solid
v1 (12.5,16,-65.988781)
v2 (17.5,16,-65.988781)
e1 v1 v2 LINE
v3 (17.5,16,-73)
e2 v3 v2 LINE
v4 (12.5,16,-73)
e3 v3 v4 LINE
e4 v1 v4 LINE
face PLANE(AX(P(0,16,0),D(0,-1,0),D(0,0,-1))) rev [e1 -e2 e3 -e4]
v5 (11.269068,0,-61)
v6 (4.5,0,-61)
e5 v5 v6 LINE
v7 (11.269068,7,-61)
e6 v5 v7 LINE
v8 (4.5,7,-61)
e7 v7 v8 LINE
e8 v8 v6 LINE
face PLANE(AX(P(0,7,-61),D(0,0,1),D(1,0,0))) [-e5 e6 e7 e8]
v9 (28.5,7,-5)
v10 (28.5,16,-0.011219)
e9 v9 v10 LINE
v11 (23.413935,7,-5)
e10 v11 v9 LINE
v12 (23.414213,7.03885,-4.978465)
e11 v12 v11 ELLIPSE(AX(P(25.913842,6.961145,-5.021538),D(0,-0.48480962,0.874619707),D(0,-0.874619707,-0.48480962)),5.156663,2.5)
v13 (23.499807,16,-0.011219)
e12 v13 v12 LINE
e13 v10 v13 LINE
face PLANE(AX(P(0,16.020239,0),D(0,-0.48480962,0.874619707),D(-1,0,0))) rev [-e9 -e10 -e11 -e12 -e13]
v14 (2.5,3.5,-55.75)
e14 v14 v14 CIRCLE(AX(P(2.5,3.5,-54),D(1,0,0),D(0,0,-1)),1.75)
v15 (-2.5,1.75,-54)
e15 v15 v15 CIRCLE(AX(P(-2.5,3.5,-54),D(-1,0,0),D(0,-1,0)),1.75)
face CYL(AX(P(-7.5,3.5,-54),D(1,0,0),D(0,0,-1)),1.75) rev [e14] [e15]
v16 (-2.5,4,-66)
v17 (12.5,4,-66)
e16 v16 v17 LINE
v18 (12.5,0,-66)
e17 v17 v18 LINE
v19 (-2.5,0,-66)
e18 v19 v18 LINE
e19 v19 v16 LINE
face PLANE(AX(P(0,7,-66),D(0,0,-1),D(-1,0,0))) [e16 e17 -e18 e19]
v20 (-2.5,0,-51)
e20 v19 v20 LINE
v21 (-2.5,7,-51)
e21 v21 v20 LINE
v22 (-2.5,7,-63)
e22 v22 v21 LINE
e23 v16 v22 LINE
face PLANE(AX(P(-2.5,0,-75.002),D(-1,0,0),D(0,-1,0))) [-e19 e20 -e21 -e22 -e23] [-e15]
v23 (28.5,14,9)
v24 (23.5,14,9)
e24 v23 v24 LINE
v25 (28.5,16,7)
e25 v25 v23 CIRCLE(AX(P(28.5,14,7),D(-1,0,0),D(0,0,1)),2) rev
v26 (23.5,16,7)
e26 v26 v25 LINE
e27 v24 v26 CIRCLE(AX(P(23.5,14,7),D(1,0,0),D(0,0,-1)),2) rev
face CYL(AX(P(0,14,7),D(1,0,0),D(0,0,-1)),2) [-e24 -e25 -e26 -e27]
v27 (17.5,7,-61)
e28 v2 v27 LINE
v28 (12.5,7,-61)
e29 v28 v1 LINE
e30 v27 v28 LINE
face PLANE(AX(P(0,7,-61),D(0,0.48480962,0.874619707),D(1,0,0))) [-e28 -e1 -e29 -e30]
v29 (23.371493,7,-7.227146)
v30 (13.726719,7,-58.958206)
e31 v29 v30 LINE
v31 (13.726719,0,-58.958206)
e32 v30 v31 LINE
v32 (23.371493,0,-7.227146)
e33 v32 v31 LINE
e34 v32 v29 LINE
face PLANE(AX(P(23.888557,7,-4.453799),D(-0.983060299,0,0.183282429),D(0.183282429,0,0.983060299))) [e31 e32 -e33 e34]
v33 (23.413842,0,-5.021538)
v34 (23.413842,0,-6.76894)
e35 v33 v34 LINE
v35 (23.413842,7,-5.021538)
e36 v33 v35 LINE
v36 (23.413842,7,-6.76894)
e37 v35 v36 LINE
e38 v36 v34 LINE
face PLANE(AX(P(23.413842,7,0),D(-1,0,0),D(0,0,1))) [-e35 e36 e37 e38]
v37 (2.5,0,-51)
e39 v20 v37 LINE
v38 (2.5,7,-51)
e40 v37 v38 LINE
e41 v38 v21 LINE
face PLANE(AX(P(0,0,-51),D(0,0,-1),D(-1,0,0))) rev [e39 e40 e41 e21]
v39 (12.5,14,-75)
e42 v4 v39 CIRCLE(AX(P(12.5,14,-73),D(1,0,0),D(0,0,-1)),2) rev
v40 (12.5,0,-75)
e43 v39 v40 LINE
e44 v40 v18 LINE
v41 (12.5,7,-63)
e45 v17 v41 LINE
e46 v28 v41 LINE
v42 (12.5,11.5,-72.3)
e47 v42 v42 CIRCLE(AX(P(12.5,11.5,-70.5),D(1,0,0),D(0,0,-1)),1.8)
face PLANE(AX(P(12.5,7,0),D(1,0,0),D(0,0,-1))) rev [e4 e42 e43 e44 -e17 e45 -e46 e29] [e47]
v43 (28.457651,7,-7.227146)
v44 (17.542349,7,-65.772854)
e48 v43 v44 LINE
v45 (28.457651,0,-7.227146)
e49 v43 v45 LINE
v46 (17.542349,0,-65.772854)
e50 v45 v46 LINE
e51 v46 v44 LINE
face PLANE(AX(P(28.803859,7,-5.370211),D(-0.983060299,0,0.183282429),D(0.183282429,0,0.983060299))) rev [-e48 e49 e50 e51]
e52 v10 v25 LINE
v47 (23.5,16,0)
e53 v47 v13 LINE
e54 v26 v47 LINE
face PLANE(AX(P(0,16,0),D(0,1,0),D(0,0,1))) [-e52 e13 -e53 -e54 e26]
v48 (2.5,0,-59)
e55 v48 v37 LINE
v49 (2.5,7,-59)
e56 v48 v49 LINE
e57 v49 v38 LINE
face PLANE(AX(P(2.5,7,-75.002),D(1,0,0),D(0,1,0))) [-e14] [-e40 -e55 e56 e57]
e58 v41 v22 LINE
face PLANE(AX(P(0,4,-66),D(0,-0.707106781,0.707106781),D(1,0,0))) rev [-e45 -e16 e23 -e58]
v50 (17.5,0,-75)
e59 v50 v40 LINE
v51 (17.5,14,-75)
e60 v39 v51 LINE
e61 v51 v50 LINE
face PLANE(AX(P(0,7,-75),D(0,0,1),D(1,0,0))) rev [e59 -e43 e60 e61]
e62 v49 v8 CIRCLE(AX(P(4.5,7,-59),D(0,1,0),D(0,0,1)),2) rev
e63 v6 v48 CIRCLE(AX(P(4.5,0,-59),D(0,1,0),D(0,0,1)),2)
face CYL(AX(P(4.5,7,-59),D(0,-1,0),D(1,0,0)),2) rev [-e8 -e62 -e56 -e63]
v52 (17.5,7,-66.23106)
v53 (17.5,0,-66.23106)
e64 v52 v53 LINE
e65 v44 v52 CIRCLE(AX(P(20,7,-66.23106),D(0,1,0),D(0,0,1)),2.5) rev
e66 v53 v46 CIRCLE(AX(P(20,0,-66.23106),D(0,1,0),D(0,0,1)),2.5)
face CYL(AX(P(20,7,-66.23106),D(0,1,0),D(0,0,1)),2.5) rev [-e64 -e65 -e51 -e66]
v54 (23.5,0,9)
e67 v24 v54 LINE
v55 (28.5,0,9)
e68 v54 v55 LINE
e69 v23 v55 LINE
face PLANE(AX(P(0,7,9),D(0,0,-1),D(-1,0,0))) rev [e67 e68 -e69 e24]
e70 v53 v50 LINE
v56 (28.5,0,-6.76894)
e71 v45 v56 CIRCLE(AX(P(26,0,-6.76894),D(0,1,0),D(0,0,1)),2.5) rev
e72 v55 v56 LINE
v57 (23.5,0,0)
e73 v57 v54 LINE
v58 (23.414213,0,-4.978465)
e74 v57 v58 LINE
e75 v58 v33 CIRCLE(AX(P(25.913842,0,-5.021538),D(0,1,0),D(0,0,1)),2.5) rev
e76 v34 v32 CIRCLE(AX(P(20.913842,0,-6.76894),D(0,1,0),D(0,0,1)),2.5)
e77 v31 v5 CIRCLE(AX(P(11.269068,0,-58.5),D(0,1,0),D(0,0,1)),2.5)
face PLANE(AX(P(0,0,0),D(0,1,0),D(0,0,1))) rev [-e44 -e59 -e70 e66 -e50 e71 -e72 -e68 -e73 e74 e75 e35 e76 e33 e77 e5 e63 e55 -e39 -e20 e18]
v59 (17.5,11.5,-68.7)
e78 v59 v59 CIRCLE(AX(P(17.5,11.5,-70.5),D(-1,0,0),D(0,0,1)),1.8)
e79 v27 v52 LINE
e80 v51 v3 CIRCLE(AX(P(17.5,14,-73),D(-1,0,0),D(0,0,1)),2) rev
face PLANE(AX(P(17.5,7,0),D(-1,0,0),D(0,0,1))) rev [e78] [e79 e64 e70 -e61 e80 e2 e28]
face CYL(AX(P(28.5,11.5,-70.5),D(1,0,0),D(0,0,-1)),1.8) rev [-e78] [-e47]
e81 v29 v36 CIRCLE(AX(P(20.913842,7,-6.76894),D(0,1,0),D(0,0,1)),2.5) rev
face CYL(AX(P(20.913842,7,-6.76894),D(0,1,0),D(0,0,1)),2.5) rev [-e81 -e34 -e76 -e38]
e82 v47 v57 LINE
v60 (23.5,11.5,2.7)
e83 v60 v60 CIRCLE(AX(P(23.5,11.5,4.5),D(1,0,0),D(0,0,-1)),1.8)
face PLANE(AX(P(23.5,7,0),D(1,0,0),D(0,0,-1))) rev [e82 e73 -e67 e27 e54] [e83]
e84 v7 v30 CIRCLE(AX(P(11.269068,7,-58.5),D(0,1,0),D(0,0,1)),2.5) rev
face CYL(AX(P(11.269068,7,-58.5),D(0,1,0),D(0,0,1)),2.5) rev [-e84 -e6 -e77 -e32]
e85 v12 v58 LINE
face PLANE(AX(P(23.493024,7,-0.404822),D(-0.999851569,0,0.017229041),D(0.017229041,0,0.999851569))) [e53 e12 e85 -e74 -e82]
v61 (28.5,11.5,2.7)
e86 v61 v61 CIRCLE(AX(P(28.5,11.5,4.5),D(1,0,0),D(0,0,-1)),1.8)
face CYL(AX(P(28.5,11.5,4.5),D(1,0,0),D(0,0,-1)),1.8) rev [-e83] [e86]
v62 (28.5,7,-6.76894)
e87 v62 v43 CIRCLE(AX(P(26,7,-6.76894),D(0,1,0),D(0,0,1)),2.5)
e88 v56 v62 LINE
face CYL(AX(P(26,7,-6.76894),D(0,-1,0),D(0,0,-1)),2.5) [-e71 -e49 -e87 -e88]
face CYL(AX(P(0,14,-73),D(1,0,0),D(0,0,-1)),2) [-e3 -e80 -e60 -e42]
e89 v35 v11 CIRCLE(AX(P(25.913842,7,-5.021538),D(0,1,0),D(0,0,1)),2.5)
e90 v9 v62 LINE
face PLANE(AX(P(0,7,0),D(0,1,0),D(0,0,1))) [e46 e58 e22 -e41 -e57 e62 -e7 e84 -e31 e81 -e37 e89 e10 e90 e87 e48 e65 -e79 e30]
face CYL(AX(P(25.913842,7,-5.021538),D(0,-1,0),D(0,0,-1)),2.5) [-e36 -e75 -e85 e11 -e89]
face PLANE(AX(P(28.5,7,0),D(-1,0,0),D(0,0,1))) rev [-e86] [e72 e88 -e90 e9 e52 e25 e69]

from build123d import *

# Parameters (mm, degrees)
BOSS_EXTRUDE1_DEPTH  = 7
BOSS_EXTRUDE2_START  = 7
SKETCH1_3_W          = 5
SKETCH1_3_H          = 9
BOSS_EXTRUDE2_DEPTH  = 9
M3_CLEARANCE_HOLE1_D = 3.6
FILLET2_R            = 2.5
CHAMFER3_SIZE        = 5
CHAMFER3_SIZE_2      = 9.020238776
CHAMFER2_SIZE        = 3
SKETCH6_W            = 5
SKETCH6_H            = 7
BOSS_EXTRUDE3_DEPTH  = 10
SKETCH7_R            = 1.75
CUT_EXTRUDE1_DEPTH   = 10
FILLET6_R            = 2
SKETCH8_W            = 84
SKETCH8_H            = 16
CUT_EXTRUDE2_DEPTH   = 26
FILLET8_R            = 2


with BuildPart() as part:
    # Sketch1 → Boss-Extrude1 (new body)
    with BuildSketch(Plane(origin=(0, 0, 0), x_dir=(1, 0, 0), z_dir=(0, 1, 0))):
        Polygon((-23.5, -9), (-23.5, 0), (-23.413842004, 5), (-23.413842004, 7), (-13.346045394, 61), (13.346045394, 61), (23.413842004, 7), (23.413842004, 5), (23.5, 0), (23.5, -9), (28.5, -9), (28.5, 7), (17.5, 66), (17.5, 75), (12.5, 75), (12.5, 66), (-12.5, 66), (-12.5, 75), (-17.5, 75), (-17.5, 66), (-28.5, 7), (-28.5, -9), align=None)
    extrude(amount=BOSS_EXTRUDE1_DEPTH)

    # Sketch1<3> → Boss-Extrude2 (add)
    with BuildSketch(Plane(origin=(0, 0, 0), x_dir=(1, 0, 0), z_dir=(0, 1, 0)).offset(BOSS_EXTRUDE2_START)):
        with Locations((-15, 70.5)):
            Rectangle(SKETCH1_3_W, SKETCH1_3_H)
        with Locations((15, 70.5)):
            Rectangle(SKETCH1_3_W, SKETCH1_3_H)
        with Locations((-26, -4.5)):
            Rectangle(SKETCH1_3_W, SKETCH1_3_H)
        with Locations((26, -4.5)):
            Rectangle(SKETCH1_3_W, SKETCH1_3_H)
    extrude(amount=BOSS_EXTRUDE2_DEPTH)

    # M3 Clearance Hole1 (through all)
    with Locations(Plane(origin=(28.5, 0, 0), x_dir=(0, 0, -1), z_dir=(1, 0, 0))):
        with Locations((-4.5, 11.5), (70.5, 11.5)):
            Hole(M3_CLEARANCE_HOLE1_D / 2)

    # Fillet2
    fillet2_edges = [part.edges().sort_by_distance(p)[0] for p in [
        (-28.5, 3.5, -7),
        (-17.5, 3.5, -66),
        (17.5, 3.5, -66),
        (28.5, 3.5, -7),
        (23.413842004, 3.5, -5),
        (23.413842004, 3.5, -7),
        (13.346045394, 3.5, -61),
        (-13.346045394, 3.5, -61),
        (-23.413842004, 3.5, -7),
        (-23.413842004, 3.5, -5),
    ]]
    fillet(fillet2_edges, radius=FILLET2_R)

    # Chamfer3
    # the kernel refuses this chamfer: 9.020238776, 5 mm, written as the material it adds along each edge
    with BuildSketch(Plane(origin=(0.156378648, 7, 0), x_dir=(1.7315070193455174e-15, -0.060867759165289366, -0.9981458389905739), z_dir=(1, 0, 0))) as chamfer3_piece_1_section:
        Polygon((CHAMFER3_SIZE * 0.998145838991, CHAMFER3_SIZE * 0.0608677591653), (-CHAMFER3_SIZE_2 * 0.0608677591677, CHAMFER3_SIZE_2 * 0.99814583903), (0, 0), align=None)
    chamfer3_piece_1 = extrude(amount=28.343621352, mode=Mode.PRIVATE)
    chamfer3_piece_1 = split(chamfer3_piece_1, bisect_by=Plane(origin=(23.456927395, 9.255059618, -2.499628978), z_dir=(0.9998515690487569, 0, -0.017229041492165368)), keep=Keep.TOP, mode=Mode.PRIVATE)
    chamfer3_piece_1 = split(chamfer3_piece_1, bisect_by=Plane(origin=(23.478460501, 16, -2.500000028), z_dir=(0, -1, 0)), keep=Keep.TOP, mode=Mode.PRIVATE)
    add(chamfer3_piece_1)
    with BuildSketch(Plane(origin=(12.5, 7, -66), x_dir=(0, -0.06086775916528939, 0.9981458389905739), z_dir=(1, 0, 0))) as chamfer3_piece_2_section:
        Polygon((CHAMFER3_SIZE * 0.998145838991, -CHAMFER3_SIZE * 0.0608677591653), (-CHAMFER3_SIZE_2 * 0.0608677591677, -CHAMFER3_SIZE_2 * 0.99814583903), (0, 0), align=None)
    chamfer3_piece_2 = extrude(amount=5, mode=Mode.PRIVATE)
    chamfer3_piece_2 = split(chamfer3_piece_2, bisect_by=Plane(origin=(15, 16, -64.333324962), z_dir=(0, -1, 0)), keep=Keep.TOP, mode=Mode.PRIVATE)
    add(chamfer3_piece_2)

    # Chamfer2
    chamfer2_edges = [part.edges().sort_by_distance(p)[0] for p in [
        (0, 7, -66),
    ]]
    chamfer(chamfer2_edges, length=CHAMFER2_SIZE)

    # Sketch6 → Boss-Extrude3 (add)
    with BuildSketch(Plane(origin=(0, 0, -61), x_dir=(-1, 0, 0), z_dir=(0, 0, 1))):
        with Locations((0, -3.5)):
            Rectangle(SKETCH6_W, SKETCH6_H)
    extrude(amount=BOSS_EXTRUDE3_DEPTH)

    # Sketch7 → Cut-Extrude1 (cut)
    with BuildSketch(Plane(origin=(2.5, 0, 0), x_dir=(0, 0, -1), z_dir=(1, 0, 0))):
        with Locations((54, 3.5)):
            Circle(SKETCH7_R)
    extrude(amount=-CUT_EXTRUDE1_DEPTH, mode=Mode.SUBTRACT)

    # Fillet6
    fillet6_edges = [part.edges().sort_by_distance(p)[0] for p in [
        (26, 16, 9),
        (-15, 16, -75),
        (15, 16, -75),
        (-26, 16, 9),
    ]]
    fillet(fillet6_edges, radius=FILLET6_R)

    # Sketch8 → Cut-Extrude2 (cut)
    with BuildSketch(Plane.ZY.offset(28.5)):
        with Locations((-33, 8)):
            Rectangle(SKETCH8_W, SKETCH8_H)
    extrude(amount=-CUT_EXTRUDE2_DEPTH, mode=Mode.SUBTRACT)

    # Fillet8
    fillet8_edges = [part.edges().sort_by_distance(p)[0] for p in [
        (2.5, 3.5, -61),
    ]]
    fillet(fillet8_edges, radius=FILLET8_R)


solid = part.part
